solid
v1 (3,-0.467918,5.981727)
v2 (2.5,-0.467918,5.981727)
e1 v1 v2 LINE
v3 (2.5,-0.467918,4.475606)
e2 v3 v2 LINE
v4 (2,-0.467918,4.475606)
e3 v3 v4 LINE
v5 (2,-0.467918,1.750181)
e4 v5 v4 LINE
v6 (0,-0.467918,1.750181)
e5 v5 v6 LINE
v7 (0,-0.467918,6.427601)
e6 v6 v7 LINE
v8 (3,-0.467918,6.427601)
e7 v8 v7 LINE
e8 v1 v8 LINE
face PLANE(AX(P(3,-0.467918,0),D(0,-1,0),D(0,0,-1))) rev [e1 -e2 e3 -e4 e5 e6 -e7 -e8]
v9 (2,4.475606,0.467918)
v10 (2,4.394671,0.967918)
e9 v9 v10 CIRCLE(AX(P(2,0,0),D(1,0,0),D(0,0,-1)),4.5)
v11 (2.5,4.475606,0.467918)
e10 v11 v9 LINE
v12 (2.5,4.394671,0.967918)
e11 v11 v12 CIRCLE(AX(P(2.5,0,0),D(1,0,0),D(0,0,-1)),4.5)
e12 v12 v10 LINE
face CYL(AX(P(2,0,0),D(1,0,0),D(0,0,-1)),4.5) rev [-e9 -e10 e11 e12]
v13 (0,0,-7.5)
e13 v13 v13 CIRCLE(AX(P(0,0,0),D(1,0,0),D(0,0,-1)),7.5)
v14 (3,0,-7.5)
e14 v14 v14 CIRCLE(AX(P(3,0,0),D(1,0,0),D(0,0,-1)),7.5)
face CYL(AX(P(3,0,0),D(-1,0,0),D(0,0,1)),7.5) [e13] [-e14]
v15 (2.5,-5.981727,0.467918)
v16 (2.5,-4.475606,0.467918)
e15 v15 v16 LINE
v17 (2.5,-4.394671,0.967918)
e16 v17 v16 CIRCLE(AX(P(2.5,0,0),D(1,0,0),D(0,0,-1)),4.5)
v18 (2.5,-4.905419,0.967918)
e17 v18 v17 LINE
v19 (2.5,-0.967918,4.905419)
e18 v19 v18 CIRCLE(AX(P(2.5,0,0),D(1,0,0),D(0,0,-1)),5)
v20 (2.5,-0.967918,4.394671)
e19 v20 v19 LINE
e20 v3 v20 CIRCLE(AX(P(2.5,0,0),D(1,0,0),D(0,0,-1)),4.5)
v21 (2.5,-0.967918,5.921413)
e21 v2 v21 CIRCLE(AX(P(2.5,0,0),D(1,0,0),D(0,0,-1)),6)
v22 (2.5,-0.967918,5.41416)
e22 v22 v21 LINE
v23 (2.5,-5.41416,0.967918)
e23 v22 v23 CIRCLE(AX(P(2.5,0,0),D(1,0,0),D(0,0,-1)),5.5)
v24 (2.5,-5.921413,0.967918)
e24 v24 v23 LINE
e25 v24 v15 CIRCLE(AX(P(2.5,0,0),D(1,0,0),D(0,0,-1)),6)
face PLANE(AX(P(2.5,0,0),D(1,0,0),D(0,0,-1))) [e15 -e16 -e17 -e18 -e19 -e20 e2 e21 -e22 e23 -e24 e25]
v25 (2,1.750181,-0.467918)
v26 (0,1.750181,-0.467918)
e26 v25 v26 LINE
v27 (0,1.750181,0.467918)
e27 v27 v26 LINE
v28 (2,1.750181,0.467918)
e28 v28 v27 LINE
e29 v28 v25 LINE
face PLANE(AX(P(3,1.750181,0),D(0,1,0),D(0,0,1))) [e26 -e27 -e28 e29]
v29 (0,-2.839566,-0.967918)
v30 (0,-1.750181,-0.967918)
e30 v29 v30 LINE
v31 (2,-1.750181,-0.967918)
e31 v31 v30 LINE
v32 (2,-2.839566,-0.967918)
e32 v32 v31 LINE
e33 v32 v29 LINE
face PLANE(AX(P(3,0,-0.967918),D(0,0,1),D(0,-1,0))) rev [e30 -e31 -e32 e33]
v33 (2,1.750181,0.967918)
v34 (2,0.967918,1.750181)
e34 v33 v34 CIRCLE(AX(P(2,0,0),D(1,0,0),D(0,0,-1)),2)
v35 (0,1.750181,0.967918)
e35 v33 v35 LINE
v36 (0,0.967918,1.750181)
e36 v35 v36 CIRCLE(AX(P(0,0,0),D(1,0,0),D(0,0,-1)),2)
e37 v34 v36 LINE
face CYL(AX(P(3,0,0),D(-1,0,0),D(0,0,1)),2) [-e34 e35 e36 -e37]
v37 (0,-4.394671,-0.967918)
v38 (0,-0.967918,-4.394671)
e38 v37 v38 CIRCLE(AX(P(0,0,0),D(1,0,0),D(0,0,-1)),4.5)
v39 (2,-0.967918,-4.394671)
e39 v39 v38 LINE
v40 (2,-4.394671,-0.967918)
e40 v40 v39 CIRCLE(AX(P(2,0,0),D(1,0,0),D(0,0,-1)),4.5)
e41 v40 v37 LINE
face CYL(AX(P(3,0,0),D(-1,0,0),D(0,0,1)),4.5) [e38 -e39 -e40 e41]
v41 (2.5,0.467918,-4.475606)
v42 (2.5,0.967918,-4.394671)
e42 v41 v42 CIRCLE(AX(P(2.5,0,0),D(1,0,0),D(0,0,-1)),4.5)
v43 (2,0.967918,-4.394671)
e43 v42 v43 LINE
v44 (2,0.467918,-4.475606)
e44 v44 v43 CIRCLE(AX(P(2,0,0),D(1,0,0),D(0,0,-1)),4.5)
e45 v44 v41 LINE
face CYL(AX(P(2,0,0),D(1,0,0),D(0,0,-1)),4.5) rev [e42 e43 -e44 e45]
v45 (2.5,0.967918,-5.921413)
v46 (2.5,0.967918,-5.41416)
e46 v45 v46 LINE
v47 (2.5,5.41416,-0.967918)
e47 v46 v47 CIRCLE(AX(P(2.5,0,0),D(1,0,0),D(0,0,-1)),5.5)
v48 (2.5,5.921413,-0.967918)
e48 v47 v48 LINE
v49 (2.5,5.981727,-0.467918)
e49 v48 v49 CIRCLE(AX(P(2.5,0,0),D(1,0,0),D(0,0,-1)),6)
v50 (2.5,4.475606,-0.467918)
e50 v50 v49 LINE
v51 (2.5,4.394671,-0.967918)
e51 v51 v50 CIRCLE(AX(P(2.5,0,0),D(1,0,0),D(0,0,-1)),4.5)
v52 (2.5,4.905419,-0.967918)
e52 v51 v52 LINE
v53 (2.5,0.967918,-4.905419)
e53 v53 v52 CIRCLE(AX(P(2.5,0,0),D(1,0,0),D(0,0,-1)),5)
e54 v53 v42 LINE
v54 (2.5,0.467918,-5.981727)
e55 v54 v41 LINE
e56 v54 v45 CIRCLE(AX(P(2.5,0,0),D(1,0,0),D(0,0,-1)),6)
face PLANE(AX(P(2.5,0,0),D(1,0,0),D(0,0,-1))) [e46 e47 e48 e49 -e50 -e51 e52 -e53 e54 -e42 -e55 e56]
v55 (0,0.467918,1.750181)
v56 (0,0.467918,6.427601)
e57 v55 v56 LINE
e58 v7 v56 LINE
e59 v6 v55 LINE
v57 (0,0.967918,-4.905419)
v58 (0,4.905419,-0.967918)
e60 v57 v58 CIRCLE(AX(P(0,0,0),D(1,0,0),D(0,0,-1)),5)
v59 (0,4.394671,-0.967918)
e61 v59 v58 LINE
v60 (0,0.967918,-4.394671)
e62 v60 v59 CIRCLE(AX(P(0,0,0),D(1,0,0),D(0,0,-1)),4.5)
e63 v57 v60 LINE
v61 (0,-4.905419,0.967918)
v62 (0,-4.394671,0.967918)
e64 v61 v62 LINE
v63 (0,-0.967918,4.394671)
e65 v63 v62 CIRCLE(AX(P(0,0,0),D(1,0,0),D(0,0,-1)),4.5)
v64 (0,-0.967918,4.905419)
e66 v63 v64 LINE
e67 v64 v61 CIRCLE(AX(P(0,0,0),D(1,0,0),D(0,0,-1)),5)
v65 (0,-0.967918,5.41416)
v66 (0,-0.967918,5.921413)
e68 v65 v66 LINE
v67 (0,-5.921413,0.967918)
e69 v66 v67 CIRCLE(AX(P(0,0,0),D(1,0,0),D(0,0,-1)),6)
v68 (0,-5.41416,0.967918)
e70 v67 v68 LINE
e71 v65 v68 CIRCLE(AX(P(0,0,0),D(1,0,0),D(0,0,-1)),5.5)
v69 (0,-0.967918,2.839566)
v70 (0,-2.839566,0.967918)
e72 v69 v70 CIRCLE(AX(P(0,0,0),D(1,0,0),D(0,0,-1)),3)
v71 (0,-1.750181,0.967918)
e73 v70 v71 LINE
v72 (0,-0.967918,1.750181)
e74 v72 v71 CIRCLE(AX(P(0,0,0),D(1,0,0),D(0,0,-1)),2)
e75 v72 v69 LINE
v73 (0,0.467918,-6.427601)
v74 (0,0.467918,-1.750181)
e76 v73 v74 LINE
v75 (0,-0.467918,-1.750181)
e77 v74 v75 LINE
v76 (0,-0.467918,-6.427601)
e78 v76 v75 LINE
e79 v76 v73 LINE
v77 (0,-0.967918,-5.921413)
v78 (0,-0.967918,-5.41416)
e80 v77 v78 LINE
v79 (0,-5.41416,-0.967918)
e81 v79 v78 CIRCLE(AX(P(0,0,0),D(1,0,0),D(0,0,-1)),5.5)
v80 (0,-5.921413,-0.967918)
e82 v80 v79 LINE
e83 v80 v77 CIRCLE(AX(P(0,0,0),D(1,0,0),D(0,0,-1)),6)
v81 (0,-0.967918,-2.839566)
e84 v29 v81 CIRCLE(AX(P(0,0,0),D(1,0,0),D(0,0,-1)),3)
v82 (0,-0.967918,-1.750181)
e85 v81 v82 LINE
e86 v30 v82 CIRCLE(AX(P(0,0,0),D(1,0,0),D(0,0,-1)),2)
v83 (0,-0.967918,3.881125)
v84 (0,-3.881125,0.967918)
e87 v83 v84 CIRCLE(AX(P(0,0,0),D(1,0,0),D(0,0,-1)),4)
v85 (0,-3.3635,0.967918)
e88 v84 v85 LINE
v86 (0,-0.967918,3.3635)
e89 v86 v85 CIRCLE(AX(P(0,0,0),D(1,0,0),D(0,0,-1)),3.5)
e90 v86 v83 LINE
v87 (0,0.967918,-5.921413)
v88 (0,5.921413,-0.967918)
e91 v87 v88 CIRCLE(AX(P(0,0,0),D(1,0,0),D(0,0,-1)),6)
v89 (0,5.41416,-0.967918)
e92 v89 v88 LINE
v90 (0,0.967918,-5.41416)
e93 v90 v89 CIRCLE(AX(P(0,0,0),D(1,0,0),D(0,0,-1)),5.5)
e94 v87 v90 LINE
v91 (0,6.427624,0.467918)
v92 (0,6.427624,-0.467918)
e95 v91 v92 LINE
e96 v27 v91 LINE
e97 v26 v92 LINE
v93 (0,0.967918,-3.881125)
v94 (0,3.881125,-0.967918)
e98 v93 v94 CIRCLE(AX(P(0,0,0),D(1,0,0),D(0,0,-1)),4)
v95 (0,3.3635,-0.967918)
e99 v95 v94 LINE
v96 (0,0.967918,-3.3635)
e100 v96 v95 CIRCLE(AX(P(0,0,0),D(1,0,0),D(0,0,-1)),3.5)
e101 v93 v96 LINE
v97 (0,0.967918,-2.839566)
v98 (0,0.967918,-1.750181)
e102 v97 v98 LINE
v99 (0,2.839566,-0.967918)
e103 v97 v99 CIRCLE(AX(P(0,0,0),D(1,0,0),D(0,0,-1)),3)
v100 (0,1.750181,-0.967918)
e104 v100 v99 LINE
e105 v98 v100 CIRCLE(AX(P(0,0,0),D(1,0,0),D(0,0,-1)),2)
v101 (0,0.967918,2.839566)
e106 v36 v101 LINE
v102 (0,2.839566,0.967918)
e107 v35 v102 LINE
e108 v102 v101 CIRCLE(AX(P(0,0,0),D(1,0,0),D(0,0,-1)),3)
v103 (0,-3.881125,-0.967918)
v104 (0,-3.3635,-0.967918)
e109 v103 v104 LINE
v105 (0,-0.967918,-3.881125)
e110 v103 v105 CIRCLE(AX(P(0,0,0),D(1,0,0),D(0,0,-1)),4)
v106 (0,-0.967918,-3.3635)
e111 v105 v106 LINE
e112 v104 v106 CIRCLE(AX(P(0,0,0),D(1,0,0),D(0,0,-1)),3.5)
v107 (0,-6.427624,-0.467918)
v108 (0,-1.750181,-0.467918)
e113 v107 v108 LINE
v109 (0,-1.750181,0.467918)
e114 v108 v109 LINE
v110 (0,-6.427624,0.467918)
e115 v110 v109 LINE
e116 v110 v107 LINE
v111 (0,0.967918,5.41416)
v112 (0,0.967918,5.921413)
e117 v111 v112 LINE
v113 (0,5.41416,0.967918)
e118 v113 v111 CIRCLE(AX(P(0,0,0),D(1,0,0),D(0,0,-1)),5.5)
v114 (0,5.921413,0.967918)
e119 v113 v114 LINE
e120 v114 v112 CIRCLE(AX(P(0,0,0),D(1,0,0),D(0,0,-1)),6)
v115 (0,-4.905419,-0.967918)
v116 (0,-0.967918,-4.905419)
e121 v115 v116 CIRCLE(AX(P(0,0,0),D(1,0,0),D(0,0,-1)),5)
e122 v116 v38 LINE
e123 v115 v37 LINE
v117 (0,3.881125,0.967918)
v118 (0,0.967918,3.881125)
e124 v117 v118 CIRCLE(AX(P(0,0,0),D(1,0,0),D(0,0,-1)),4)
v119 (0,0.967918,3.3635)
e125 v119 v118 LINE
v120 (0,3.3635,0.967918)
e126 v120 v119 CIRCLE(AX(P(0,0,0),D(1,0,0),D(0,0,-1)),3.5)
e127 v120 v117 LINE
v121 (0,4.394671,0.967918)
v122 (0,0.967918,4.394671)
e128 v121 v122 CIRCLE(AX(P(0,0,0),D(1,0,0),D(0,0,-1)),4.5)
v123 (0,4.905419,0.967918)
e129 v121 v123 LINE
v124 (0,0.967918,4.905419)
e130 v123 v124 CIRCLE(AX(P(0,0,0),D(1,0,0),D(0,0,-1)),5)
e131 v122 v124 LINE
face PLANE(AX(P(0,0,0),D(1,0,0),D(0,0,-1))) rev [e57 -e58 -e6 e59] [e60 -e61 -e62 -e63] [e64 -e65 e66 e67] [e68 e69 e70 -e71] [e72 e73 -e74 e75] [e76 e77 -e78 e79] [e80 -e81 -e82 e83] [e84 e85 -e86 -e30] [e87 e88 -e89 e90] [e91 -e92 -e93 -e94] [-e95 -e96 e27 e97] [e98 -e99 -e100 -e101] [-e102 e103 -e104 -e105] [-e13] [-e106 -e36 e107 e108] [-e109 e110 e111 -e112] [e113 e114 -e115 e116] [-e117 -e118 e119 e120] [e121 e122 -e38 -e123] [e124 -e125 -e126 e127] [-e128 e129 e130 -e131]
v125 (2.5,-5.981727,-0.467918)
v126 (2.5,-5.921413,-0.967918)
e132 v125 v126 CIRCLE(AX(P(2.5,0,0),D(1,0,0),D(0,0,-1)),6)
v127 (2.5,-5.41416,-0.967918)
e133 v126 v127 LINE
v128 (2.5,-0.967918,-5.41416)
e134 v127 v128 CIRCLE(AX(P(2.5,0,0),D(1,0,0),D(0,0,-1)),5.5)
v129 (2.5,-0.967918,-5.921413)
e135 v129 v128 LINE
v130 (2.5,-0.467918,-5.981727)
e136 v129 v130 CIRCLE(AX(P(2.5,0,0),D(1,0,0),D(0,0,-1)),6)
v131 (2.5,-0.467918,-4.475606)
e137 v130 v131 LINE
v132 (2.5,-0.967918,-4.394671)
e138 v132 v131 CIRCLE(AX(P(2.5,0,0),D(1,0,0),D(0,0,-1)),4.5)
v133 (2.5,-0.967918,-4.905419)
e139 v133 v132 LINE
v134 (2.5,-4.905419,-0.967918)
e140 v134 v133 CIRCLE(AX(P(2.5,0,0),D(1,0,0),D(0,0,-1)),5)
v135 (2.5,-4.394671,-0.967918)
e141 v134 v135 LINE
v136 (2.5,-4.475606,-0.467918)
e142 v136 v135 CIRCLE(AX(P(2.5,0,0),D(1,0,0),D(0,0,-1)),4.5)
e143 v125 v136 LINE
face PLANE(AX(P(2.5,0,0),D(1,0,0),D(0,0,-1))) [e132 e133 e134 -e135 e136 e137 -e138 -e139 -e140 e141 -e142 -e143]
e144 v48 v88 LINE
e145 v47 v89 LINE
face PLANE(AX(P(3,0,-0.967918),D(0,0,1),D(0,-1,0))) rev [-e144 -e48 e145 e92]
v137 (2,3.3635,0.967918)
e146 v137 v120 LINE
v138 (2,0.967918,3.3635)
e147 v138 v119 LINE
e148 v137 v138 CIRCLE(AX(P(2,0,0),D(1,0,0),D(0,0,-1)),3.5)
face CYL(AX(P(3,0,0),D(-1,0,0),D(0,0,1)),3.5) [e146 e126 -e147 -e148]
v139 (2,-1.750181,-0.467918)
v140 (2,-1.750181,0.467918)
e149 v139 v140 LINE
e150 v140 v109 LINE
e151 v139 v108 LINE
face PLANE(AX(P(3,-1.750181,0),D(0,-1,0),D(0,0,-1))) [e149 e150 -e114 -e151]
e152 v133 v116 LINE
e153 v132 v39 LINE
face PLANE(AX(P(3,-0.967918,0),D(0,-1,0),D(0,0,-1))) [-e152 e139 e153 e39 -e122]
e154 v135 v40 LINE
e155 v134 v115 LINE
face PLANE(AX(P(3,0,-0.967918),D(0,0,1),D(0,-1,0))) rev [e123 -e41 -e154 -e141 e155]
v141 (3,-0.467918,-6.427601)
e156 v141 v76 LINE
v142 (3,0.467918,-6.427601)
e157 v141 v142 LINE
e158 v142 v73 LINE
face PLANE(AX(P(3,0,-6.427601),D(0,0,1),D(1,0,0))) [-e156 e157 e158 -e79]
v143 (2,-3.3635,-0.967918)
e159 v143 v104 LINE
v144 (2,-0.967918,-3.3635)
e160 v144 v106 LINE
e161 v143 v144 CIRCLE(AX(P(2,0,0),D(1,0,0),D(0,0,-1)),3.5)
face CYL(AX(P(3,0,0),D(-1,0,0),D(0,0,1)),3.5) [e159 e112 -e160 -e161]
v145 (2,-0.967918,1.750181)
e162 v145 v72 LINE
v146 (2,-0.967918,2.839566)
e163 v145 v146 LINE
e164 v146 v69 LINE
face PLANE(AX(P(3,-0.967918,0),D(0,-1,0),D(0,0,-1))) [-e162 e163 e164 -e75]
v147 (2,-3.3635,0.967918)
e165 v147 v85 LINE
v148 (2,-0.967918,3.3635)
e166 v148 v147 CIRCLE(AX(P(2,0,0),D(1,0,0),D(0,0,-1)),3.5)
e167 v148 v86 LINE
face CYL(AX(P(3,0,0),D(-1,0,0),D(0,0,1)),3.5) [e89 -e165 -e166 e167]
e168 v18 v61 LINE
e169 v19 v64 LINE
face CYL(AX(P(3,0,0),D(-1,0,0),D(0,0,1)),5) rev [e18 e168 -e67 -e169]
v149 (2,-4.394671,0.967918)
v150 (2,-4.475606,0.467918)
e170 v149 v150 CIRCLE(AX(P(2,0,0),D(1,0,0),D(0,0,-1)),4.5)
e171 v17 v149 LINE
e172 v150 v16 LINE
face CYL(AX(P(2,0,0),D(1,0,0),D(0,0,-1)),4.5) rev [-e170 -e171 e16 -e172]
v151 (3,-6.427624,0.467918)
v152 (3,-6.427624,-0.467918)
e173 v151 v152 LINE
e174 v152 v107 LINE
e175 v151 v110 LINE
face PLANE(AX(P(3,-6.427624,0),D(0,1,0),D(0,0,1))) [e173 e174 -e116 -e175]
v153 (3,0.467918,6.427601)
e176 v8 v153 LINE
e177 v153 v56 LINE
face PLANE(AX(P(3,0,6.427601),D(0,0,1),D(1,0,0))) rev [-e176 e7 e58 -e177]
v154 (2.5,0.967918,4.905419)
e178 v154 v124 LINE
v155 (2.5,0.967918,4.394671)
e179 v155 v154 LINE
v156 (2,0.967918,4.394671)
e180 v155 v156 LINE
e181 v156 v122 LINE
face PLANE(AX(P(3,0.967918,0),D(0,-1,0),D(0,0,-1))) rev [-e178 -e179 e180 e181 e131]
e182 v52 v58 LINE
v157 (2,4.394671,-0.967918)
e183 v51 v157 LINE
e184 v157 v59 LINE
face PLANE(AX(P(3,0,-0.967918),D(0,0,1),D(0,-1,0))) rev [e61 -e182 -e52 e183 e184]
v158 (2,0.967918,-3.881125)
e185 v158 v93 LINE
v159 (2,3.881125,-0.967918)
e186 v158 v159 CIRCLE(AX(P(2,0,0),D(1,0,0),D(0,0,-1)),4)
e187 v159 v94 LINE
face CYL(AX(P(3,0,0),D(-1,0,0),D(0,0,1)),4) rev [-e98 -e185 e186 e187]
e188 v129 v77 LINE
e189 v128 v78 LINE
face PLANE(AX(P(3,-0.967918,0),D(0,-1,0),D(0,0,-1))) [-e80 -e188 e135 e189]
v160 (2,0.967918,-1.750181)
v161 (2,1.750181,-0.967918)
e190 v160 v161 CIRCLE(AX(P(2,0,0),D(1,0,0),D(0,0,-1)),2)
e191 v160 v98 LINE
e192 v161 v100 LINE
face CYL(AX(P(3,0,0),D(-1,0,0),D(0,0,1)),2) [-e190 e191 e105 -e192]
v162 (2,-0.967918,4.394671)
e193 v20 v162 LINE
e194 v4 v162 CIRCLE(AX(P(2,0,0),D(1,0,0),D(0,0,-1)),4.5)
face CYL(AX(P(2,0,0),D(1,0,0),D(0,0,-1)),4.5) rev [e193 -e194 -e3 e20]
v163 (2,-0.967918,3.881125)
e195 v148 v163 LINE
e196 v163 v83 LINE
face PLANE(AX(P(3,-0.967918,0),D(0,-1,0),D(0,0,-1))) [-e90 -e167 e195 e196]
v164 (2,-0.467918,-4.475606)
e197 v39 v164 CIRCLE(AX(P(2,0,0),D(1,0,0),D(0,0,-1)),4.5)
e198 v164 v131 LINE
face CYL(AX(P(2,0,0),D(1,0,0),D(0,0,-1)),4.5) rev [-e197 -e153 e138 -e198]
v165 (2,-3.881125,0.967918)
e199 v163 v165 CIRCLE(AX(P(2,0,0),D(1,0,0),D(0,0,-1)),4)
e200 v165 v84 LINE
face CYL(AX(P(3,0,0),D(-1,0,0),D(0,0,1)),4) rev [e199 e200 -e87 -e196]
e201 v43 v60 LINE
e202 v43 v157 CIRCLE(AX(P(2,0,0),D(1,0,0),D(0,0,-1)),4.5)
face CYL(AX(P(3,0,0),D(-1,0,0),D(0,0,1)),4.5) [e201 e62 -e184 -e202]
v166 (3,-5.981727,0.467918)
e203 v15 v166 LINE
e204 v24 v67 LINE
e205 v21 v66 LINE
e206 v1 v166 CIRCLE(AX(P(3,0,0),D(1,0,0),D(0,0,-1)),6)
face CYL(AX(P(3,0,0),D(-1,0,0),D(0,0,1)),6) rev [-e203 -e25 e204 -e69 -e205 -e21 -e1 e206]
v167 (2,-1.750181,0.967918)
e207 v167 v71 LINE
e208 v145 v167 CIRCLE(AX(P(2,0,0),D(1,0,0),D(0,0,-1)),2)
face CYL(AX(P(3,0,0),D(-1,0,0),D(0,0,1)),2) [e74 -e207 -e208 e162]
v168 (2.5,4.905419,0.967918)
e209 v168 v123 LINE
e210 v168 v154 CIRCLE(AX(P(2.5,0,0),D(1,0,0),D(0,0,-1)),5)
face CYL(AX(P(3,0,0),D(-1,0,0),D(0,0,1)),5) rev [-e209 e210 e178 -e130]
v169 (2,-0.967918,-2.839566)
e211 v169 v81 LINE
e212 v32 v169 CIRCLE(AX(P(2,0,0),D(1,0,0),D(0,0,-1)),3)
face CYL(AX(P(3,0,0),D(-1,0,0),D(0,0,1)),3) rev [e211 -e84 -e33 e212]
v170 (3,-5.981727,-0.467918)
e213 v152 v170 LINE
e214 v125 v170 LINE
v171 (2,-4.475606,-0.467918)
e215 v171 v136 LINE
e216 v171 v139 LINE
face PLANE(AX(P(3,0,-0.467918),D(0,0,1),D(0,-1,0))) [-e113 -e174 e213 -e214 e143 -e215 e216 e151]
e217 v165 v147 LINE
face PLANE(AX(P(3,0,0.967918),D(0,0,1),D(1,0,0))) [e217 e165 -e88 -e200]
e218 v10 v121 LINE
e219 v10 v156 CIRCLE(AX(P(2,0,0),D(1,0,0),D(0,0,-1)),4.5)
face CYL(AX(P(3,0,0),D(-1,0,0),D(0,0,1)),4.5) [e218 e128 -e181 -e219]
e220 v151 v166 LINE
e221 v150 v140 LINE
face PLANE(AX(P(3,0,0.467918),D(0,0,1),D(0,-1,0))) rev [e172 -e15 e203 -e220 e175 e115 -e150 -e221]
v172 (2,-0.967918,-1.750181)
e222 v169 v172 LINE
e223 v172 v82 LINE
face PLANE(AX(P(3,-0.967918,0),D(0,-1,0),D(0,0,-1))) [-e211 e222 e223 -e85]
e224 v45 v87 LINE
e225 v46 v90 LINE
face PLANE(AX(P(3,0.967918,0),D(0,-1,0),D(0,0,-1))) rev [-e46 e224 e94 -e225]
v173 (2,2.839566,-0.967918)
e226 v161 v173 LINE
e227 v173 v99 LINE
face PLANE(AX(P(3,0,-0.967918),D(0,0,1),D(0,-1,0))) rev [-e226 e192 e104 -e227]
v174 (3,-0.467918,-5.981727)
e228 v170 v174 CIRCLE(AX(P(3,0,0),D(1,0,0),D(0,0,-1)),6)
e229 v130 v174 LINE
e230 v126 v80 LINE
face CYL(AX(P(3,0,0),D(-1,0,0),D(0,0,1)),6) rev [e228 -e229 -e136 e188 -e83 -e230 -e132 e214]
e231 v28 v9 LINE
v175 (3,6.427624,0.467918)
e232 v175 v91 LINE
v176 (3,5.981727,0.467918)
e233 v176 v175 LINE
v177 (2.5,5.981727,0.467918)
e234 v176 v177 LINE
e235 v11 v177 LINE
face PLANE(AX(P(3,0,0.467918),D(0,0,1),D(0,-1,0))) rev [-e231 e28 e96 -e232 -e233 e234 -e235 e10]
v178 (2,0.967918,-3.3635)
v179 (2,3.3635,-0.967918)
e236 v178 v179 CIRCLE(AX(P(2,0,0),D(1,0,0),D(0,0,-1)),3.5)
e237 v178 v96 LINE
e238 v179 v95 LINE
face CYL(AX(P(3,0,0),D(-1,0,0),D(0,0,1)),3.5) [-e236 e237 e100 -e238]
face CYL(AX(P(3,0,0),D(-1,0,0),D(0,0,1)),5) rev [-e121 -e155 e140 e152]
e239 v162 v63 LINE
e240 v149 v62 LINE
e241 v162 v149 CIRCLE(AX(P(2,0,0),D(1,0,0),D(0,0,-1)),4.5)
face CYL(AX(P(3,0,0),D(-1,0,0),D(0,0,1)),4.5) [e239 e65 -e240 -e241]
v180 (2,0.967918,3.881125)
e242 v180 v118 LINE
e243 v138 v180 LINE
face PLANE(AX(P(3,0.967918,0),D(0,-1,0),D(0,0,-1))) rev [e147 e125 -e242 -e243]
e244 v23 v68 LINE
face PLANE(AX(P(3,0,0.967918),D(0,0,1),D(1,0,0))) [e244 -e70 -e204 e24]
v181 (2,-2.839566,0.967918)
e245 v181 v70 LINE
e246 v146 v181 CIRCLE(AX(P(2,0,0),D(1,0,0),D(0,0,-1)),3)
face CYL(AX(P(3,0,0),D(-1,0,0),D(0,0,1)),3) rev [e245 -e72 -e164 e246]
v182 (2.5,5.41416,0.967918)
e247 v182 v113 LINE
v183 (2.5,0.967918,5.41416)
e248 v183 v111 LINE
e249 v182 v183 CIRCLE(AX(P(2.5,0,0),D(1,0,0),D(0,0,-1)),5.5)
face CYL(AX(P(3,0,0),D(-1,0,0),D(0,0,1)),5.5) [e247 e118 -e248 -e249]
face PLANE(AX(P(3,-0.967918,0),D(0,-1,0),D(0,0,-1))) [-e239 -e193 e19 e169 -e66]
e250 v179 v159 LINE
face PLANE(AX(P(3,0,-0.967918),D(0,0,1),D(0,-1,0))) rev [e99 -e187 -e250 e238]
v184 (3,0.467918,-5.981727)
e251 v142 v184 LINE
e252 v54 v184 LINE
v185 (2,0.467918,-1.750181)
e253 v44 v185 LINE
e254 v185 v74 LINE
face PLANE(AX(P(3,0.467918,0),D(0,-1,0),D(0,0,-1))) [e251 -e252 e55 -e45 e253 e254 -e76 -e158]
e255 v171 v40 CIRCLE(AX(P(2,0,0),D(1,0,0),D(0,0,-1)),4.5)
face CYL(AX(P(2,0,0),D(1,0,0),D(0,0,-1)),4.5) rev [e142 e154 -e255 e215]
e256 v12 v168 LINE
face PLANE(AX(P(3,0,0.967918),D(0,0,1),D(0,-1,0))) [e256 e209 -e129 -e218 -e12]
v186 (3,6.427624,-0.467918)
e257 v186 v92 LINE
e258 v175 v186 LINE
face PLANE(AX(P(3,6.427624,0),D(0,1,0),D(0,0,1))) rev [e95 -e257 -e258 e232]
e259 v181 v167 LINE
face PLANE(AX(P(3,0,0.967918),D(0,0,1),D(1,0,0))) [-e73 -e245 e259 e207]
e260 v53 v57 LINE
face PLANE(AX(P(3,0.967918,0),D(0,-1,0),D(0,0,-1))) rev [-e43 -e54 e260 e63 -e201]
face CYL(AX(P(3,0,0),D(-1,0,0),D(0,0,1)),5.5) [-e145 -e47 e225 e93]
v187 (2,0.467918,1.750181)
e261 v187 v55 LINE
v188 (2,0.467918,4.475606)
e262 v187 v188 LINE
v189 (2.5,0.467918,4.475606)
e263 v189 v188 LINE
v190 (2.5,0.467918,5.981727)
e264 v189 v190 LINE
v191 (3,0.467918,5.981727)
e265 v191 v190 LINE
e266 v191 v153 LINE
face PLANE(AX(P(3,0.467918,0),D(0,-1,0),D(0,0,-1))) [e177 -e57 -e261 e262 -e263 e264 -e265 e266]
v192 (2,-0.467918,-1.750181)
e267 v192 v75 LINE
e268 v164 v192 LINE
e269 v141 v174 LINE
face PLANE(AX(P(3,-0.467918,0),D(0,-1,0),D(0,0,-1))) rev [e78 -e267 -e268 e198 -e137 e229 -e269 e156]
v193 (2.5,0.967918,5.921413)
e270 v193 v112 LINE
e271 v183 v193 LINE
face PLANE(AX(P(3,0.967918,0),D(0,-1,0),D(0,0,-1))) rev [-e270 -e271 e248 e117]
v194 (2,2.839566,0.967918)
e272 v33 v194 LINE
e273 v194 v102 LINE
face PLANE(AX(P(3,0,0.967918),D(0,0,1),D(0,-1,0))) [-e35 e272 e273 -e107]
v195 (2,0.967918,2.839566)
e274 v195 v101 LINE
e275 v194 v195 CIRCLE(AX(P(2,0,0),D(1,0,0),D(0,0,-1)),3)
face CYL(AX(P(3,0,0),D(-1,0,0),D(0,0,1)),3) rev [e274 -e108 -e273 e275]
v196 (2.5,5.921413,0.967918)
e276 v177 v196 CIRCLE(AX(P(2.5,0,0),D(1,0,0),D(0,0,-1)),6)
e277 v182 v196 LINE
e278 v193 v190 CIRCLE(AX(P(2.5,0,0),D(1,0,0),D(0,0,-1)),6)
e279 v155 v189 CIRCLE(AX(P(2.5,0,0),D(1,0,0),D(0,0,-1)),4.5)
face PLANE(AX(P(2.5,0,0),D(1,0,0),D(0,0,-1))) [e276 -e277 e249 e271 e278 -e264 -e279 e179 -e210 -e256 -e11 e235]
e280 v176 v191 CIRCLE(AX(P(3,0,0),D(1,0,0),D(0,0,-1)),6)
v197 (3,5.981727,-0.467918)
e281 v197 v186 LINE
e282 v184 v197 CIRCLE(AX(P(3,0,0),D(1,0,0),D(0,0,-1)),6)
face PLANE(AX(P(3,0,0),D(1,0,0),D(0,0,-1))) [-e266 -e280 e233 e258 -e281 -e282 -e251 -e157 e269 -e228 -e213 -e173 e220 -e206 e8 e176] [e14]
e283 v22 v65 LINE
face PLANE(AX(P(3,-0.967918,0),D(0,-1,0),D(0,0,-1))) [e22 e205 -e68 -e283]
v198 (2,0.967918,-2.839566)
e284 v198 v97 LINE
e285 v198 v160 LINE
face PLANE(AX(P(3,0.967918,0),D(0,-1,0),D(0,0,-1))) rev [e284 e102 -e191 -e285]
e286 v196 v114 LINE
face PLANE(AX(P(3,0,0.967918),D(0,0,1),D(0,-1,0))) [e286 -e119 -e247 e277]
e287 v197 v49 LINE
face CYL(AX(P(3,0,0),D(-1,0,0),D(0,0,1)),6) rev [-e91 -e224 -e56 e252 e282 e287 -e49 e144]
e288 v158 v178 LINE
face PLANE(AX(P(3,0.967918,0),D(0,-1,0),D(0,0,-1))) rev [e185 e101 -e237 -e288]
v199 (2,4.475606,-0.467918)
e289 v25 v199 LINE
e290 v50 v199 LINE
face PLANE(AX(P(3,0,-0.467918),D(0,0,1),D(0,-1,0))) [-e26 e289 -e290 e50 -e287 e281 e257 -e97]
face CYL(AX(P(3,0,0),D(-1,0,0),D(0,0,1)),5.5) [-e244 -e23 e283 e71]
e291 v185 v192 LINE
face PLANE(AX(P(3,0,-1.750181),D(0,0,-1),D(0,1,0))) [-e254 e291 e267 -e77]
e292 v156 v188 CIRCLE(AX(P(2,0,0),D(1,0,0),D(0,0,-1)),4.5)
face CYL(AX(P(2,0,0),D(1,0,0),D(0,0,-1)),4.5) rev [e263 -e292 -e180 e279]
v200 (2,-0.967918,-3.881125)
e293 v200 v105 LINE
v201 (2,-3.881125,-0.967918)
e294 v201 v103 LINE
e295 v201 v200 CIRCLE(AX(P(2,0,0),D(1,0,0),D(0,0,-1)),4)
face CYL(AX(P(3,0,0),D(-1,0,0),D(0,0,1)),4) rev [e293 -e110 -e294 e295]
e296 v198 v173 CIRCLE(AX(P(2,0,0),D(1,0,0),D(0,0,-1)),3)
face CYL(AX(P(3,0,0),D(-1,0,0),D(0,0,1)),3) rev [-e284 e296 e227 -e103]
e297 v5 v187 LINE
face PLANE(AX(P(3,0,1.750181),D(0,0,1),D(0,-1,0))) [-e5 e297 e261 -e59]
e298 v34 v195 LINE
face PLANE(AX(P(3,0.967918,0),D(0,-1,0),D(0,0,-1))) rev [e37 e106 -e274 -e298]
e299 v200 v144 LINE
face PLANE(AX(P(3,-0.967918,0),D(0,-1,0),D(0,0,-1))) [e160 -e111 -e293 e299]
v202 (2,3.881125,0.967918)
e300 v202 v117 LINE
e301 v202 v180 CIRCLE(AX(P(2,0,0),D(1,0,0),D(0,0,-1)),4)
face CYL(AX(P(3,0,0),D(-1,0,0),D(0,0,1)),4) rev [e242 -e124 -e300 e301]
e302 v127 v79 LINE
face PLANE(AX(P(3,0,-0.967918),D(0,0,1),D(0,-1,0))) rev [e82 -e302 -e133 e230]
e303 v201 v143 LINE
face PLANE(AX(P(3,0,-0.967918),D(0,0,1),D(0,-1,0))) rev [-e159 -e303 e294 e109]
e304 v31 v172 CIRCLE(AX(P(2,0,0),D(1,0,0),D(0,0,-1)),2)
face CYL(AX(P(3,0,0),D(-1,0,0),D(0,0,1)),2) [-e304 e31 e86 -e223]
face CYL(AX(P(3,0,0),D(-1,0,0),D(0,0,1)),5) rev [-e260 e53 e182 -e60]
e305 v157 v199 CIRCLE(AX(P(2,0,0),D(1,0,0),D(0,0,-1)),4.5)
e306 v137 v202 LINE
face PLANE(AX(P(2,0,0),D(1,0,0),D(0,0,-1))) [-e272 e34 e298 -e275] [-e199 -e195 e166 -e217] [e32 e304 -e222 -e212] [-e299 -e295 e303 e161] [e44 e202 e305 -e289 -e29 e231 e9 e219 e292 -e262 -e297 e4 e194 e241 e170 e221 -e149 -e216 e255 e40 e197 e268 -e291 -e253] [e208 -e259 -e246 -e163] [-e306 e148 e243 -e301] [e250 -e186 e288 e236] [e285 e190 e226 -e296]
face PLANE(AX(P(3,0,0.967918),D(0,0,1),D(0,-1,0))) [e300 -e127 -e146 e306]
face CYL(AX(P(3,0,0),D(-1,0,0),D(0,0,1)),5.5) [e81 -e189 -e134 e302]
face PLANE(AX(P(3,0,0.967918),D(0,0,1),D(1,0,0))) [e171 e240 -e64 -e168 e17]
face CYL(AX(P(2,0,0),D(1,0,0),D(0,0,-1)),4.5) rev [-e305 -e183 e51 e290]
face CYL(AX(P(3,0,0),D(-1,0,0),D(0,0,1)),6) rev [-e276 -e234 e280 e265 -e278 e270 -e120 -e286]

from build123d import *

# Parameters (mm, degrees)
SKETCH1_R           = 7.5
SKETCH1_W           = 0.935836939
SKETCH1_H           = 4.677443156
SKETCH1_W_2         = 4.677419546
SKETCH1_H_2         = 0.93583693
BOSS_EXTRUDE1_DEPTH = 3
CUT_EXTRUDE1_START  = -0.5
SKETCH2_R           = 6
CUT_EXTRUDE1_DEPTH  = 0.5
CUT_EXTRUDE2_START  = -0.5
SKETCH3_R           = 4.5
CUT_EXTRUDE2_DEPTH  = 0.5


with BuildPart() as part:
    # Sketch1 → Boss-Extrude1 (new body)
    with BuildSketch(Plane(origin=(0, 0, 0), x_dir=(0, 0, -1), z_dir=(1, 0, 0))):
        Circle(SKETCH1_R)
        with BuildLine():
            Line((-0.967918465, 2.839565785), (-0.967918465, 1.750181089))
            ThreePointArc((-0.967918465, 1.750181089), (-1.414213562, 1.414213562), (-1.750181089, 0.967918465))
            Line((-1.750181089, 0.967918465), (-2.839565785, 0.967918465))
            ThreePointArc((-2.839565785, 0.967918465), (-2.121320344, 2.121320344), (-0.967918465, 2.839565785))
        make_face(mode=Mode.SUBTRACT)
        with BuildLine():
            Line((-0.967918465, 3.881125332), (-0.967918465, 3.363500237))
            ThreePointArc((-0.967918465, 3.363500237), (-2.474873734, 2.474873734), (-3.363500237, 0.967918465))
            Line((-3.363500237, 0.967918465), (-3.881125332, 0.967918465))
            ThreePointArc((-3.881125332, 0.967918465), (-2.828427125, 2.828427125), (-0.967918465, 3.881125332))
        make_face(mode=Mode.SUBTRACT)
        with BuildLine():
            Line((-0.967918465, 4.905418825), (-0.967918465, 4.394671074))
            ThreePointArc((-0.967918465, 4.394671074), (-3.181980515, 3.181980515), (-4.394671074, 0.967918465))
            Line((-4.394671074, 0.967918465), (-4.905418825, 0.967918465))
            ThreePointArc((-4.905418825, 0.967918465), (-3.535533906, 3.535533906), (-0.967918465, 4.905418825))
        make_face(mode=Mode.SUBTRACT)
        with BuildLine():
            Line((-0.967918465, 5.921413163), (-0.967918465, 5.414160493))
            ThreePointArc((-0.967918465, 5.414160493), (-3.889087297, 3.889087297), (-5.414160493, 0.967918465))
            Line((-5.414160493, 0.967918465), (-5.921413163, 0.967918465))
            ThreePointArc((-5.921413163, 0.967918465), (-4.242640687, 4.242640687), (-0.967918465, 5.921413163))
        make_face(mode=Mode.SUBTRACT)
        with Locations((-5e-09, 4.088902667)):
            Rectangle(SKETCH1_W, SKETCH1_H, mode=Mode.SUBTRACT)
        with Locations((-4.088890862, 0)):
            Rectangle(SKETCH1_W_2, SKETCH1_H_2, mode=Mode.SUBTRACT)
        with Locations((-5e-09, -4.088902667)):
            Rectangle(SKETCH1_W, SKETCH1_H, mode=Mode.SUBTRACT)
        with Locations((4.088890862, 0)):
            Rectangle(SKETCH1_W_2, SKETCH1_H_2, mode=Mode.SUBTRACT)
        with BuildLine():
            ThreePointArc((1.750181089, 0.967918465), (1.414213562, 1.414213562), (0.967918465, 1.750181089))
            Line((0.967918465, 1.750181089), (0.967918465, 2.839565785))
            ThreePointArc((0.967918465, 2.839565785), (2.121320344, 2.121320344), (2.839565785, 0.967918465))
            Line((2.839565785, 0.967918465), (1.750181089, 0.967918465))
        make_face(mode=Mode.SUBTRACT)
        with BuildLine():
            ThreePointArc((0.967918465, -1.750181089), (1.414213562, -1.414213562), (1.750181089, -0.967918465))
            Line((1.750181089, -0.967918465), (2.839565785, -0.967918465))
            ThreePointArc((2.839565785, -0.967918465), (2.121320344, -2.121320344), (0.967918465, -2.839565785))
            Line((0.967918465, -2.839565785), (0.967918465, -1.750181089))
        make_face(mode=Mode.SUBTRACT)
        with BuildLine():
            ThreePointArc((-1.750181089, -0.967918465), (-1.414213562, -1.414213562), (-0.967918465, -1.750181089))
            Line((-0.967918465, -1.750181089), (-0.967918465, -2.839565785))
            ThreePointArc((-0.967918465, -2.839565785), (-2.121320344, -2.121320344), (-2.839565785, -0.967918465))
            Line((-2.839565785, -0.967918465), (-1.750181089, -0.967918465))
        make_face(mode=Mode.SUBTRACT)
        with BuildLine():
            Line((0.967918465, 5.414160493), (0.967918465, 5.921413163))
            ThreePointArc((0.967918465, 5.921413163), (4.242640687, 4.242640687), (5.921413163, 0.967918465))
            Line((5.921413163, 0.967918465), (5.414160493, 0.967918465))
            ThreePointArc((5.414160493, 0.967918465), (3.889087297, 3.889087297), (0.967918465, 5.414160493))
        make_face(mode=Mode.SUBTRACT)
        with BuildLine():
            Line((0.967918465, 4.394671074), (0.967918465, 4.905418825))
            ThreePointArc((0.967918465, 4.905418825), (3.535533906, 3.535533906), (4.905418825, 0.967918465))
            Line((4.905418825, 0.967918465), (4.394671074, 0.967918465))
            ThreePointArc((4.394671074, 0.967918465), (3.181980515, 3.181980515), (0.967918465, 4.394671074))
        make_face(mode=Mode.SUBTRACT)
        with BuildLine():
            Line((0.967918465, 3.363500237), (0.967918465, 3.881125332))
            ThreePointArc((0.967918465, 3.881125332), (2.828427125, 2.828427125), (3.881125332, 0.967918465))
            Line((3.881125332, 0.967918465), (3.363500237, 0.967918465))
            ThreePointArc((3.363500237, 0.967918465), (2.474873734, 2.474873734), (0.967918465, 3.363500237))
        make_face(mode=Mode.SUBTRACT)
        with BuildLine():
            Line((-3.881125332, -0.967918465), (-3.363500237, -0.967918465))
            ThreePointArc((-3.363500237, -0.967918465), (-2.474873734, -2.474873734), (-0.967918465, -3.363500237))
            Line((-0.967918465, -3.363500237), (-0.967918465, -3.881125332))
            ThreePointArc((-0.967918465, -3.881125332), (-2.828427125, -2.828427125), (-3.881125332, -0.967918465))
        make_face(mode=Mode.SUBTRACT)
        with BuildLine():
            Line((-4.905418825, -0.967918465), (-4.394671074, -0.967918465))
            ThreePointArc((-4.394671074, -0.967918465), (-3.181980515, -3.181980515), (-0.967918465, -4.394671074))
            Line((-0.967918465, -4.394671074), (-0.967918465, -4.905418825))
            ThreePointArc((-0.967918465, -4.905418825), (-3.535533906, -3.535533906), (-4.905418825, -0.967918465))
        make_face(mode=Mode.SUBTRACT)
        with BuildLine():
            Line((-5.921413163, -0.967918465), (-5.414160493, -0.967918465))
            ThreePointArc((-5.414160493, -0.967918465), (-3.889087297, -3.889087297), (-0.967918465, -5.414160493))
            Line((-0.967918465, -5.414160493), (-0.967918465, -5.921413163))
            ThreePointArc((-0.967918465, -5.921413163), (-4.242640687, -4.242640687), (-5.921413163, -0.967918465))
        make_face(mode=Mode.SUBTRACT)
        with BuildLine():
            Line((0.967918465, -3.881125332), (0.967918465, -3.363500237))
            ThreePointArc((0.967918465, -3.363500237), (2.474873734, -2.474873734), (3.363500237, -0.967918465))
            Line((3.363500237, -0.967918465), (3.881125332, -0.967918465))
            ThreePointArc((3.881125332, -0.967918465), (2.828427125, -2.828427125), (0.967918465, -3.881125332))
        make_face(mode=Mode.SUBTRACT)
        with BuildLine():
            Line((0.967918465, -4.905418825), (0.967918465, -4.394671074))
            ThreePointArc((0.967918465, -4.394671074), (3.181980515, -3.181980515), (4.394671074, -0.967918465))
            Line((4.394671074, -0.967918465), (4.905418825, -0.967918465))
            ThreePointArc((4.905418825, -0.967918465), (3.535533906, -3.535533906), (0.967918465, -4.905418825))
        make_face(mode=Mode.SUBTRACT)
        with BuildLine():
            Line((0.967918465, -5.921413163), (0.967918465, -5.414160493))
            ThreePointArc((0.967918465, -5.414160493), (3.889087297, -3.889087297), (5.414160493, -0.967918465))
            Line((5.414160493, -0.967918465), (5.921413163, -0.967918465))
            ThreePointArc((5.921413163, -0.967918465), (4.242640687, -4.242640687), (0.967918465, -5.921413163))
        make_face(mode=Mode.SUBTRACT)
    extrude(amount=BOSS_EXTRUDE1_DEPTH)

    # Sketch2 → Cut-Extrude1 (cut)
    with BuildSketch(Plane(origin=(3, 0, 0), x_dir=(0, 0, -1), z_dir=(1, 0, 0)).offset(CUT_EXTRUDE1_START)):
        Circle(SKETCH2_R)
    extrude(amount=CUT_EXTRUDE1_DEPTH, mode=Mode.SUBTRACT)

    # Sketch3 → Cut-Extrude2 (cut)
    with BuildSketch(Plane(origin=(2.5, 0, 0), x_dir=(0, 0, -1), z_dir=(1, 0, 0)).offset(CUT_EXTRUDE2_START)):
        Circle(SKETCH3_R)
    extrude(amount=CUT_EXTRUDE2_DEPTH, mode=Mode.SUBTRACT)


solid = part.part
